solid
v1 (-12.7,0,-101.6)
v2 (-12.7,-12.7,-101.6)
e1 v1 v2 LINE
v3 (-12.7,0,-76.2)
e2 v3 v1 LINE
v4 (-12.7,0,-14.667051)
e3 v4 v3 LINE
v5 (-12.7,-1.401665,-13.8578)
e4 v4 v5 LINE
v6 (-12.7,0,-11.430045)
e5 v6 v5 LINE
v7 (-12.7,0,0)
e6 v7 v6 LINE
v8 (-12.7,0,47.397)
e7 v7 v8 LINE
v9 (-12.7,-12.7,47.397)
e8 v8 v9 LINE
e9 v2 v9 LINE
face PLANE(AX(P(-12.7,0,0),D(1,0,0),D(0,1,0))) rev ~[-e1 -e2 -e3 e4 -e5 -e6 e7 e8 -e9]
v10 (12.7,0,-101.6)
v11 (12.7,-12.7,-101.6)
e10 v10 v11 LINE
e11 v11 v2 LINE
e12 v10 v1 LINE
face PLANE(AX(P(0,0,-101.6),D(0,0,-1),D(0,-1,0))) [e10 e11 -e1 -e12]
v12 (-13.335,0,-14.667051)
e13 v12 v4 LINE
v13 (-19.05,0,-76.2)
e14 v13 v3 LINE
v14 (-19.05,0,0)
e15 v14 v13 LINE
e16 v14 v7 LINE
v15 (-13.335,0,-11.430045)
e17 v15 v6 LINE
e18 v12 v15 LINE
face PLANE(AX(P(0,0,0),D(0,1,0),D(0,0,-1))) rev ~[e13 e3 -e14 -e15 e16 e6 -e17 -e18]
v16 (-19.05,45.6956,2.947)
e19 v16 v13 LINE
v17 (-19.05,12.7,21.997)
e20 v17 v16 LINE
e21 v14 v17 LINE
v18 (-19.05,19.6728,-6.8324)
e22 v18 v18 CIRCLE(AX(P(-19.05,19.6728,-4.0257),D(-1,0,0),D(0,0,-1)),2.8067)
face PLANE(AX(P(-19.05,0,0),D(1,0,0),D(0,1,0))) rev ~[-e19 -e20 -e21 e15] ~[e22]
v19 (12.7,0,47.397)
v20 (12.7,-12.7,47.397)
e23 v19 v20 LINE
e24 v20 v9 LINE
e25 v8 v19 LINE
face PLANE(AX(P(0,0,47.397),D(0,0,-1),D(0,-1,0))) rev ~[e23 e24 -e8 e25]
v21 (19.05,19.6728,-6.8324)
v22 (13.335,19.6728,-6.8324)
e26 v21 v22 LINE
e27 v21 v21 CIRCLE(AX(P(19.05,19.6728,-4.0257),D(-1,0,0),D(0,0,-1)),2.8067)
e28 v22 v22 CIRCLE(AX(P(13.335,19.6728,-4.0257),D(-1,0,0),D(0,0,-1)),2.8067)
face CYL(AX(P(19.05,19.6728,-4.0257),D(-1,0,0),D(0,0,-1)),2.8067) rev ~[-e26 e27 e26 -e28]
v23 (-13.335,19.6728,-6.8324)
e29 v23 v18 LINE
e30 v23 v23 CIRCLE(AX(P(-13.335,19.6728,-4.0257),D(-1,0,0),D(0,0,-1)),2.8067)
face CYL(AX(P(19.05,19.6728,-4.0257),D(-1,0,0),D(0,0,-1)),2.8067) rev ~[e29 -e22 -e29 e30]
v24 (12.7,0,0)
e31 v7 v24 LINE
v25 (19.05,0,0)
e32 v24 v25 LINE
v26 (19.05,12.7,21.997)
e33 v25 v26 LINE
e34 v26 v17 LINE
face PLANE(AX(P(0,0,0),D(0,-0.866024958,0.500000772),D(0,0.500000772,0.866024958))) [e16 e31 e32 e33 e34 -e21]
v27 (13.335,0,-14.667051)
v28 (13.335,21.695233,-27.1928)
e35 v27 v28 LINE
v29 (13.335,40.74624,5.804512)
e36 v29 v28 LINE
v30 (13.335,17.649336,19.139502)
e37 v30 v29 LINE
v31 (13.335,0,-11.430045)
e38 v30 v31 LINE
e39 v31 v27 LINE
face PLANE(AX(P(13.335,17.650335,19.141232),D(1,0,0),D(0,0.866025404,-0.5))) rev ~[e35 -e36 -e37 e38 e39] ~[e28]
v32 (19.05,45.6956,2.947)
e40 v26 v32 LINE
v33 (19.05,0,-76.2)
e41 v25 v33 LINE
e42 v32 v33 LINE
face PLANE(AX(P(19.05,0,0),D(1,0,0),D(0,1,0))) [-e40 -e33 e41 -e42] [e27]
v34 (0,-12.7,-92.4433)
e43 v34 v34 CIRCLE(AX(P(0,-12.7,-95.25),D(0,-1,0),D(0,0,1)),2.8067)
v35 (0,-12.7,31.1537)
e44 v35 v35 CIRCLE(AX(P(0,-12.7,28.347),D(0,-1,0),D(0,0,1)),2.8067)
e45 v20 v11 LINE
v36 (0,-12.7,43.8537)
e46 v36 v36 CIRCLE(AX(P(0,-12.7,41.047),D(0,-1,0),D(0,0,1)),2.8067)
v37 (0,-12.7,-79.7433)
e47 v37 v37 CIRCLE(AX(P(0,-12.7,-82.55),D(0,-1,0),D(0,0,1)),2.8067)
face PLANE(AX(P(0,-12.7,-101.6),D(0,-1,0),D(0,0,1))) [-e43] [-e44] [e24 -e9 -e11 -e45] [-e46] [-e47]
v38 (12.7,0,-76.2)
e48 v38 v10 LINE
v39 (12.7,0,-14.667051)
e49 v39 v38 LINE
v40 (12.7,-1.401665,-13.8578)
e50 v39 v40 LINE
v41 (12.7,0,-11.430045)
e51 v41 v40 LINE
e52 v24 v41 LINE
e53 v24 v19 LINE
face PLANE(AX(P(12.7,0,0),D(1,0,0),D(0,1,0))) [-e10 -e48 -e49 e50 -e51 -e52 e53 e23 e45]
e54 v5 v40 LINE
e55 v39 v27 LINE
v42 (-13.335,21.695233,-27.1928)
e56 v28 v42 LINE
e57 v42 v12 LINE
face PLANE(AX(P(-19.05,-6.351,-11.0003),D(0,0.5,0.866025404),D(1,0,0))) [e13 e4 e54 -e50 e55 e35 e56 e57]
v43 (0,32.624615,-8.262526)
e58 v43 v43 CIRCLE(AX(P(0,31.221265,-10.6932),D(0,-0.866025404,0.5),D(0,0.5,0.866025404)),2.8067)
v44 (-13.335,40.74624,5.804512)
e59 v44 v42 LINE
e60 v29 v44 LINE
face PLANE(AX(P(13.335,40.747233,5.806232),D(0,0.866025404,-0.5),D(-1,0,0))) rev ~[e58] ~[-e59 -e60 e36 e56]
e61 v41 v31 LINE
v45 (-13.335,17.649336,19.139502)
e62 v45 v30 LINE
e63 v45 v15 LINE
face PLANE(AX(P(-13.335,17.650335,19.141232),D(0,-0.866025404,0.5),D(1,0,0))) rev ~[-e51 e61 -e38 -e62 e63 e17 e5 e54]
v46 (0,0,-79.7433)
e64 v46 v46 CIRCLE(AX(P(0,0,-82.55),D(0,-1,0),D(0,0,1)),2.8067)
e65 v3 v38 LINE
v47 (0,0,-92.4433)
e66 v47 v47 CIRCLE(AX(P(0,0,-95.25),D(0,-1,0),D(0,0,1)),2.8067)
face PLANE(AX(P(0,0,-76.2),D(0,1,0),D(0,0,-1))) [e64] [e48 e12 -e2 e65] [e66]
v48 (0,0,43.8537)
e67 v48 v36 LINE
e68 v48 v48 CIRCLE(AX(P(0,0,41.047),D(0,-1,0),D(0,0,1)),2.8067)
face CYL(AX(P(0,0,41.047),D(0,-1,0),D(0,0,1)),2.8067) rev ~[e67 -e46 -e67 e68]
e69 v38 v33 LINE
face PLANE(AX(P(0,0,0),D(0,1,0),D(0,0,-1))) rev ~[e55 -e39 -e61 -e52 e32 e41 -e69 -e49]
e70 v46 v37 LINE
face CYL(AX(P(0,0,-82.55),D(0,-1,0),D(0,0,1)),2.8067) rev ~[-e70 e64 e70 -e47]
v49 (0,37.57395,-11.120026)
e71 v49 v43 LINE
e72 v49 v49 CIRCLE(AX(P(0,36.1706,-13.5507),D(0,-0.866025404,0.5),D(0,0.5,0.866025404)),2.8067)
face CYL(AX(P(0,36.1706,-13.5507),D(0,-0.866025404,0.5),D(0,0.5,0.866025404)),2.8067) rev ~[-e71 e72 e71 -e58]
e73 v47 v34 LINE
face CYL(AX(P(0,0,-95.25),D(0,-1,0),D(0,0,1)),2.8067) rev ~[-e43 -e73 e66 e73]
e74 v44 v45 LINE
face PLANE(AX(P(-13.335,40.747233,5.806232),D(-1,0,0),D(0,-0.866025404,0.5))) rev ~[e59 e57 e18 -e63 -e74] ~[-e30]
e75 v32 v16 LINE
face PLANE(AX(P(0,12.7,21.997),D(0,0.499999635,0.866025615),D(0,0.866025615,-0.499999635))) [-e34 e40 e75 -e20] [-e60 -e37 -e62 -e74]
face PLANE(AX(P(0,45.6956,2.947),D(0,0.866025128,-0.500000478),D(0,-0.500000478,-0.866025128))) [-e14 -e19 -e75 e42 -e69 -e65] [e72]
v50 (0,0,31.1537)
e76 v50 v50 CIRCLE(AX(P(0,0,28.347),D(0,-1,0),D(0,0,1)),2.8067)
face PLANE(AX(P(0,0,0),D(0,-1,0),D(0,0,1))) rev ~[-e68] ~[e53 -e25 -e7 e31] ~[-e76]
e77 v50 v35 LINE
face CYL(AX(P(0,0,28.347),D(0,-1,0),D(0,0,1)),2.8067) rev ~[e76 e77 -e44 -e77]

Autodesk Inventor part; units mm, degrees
ref_plane "YZ Plane" through (0, 0, 0) normal (1, 0, 0) x (0, 1, 0)
ref_plane "XZ Plane" through (0, 0, 0) normal (0, 1, 0) x (-1, 0, 0)
ref_plane "XY Plane" through (0, 0, 0) normal (0, 0, 1) x (1, 0, 0)
sketch "Sketch1" plane through (0, 0, 0) normal (1, 0, 0) x (0, 1, 0)
  line L0 (0, 0) -> (12.7, 21.997)
  line L1 (0, 0) -> (0, 47.397)
  line L2 (0, 0) -> (0, -101.6)
  line L3 (12.7, 21.997) -> (45.6956, 2.947)
  line L4 (45.6956, 2.947) -> (0, -76.2)
  line L5 (12.7, 21.997) -> (0, 21.997) construction
  line L6 (0, 47.397) -> (-12.7, 47.397)
  line L7 (-12.7, 47.397) -> (-12.7, -76.2)
  line L8 (0, -101.6) -> (-12.7, -101.6)
  line L9 (-12.7, -101.6) -> (-12.7, -76.2)
  dimension "d0" = 38.1
  dimension "d1" = 25.4
  dimension "d6" = 30
  dimension "d7" = 25.4
  dimension "d21" = 25.4
  dimension "d22" = 12.7
extrude "Extrusion2" add sketch "Sketch1" along normal mid plane 38.1 contours L0 L3 L4 L2
extrude "Extrusion3" add sketch "Sketch1" along normal mid plane 25.4
sketch "Sketch2" plane through (-19.05, 12.7, 21.997) normal (0, 0.5, 0.8660254) x (1, 0, 0)
  line L0 (32.385, 5.715) -> (32.385, 32.385)
  line L1 (32.385, 32.385) -> (5.715, 32.385)
  line L2 (5.715, 32.385) -> (5.715, 5.715)
  line L3 (5.715, 5.715) -> (32.385, 5.715)
  line L4 (32.385, 5.715) -> (5.715, 32.385) construction
  line L5 (32.385, 32.385) -> (5.715, 5.715) construction
  line L6 (0, 0) -> (0, 38.1) projected
  line L7 (38.1, 38.1) -> (38.1, 0) projected
  line L8 (0, 38.1) -> (38.1, 38.1) projected
  point P0 (19.05, 0)
  point P1 (19.05, 19.05)
  dimension "d16" = 26.67
  dimension "d17" = 19.05
  dimension "d18" = 19.05
extrude "Extrusion4" cut sketch "Sketch2" against normal blind 38.1
sketch "Sketch3" plane through (-12.7, 0, 47.397) normal (0, 1, 0) x (1, 0, 0)
  point P0 (12.7, 47.397)
sketch "Sketch4" plane through (-12.7, 0, 47.397) normal (0, 1, 0) x (1, 0, 0)
  line L0 (25.4, 0) -> (0, 0) projected
  line L1 (-6.35, 25.4) -> (31.75, 25.4) projected
  line L2 (0, 123.597) -> (25.4, 123.597) projected
  line L3 (25.4, 148.997) -> (0, 148.997) projected
  point P0 (12.7, 47.397)
  point P1 (12.7, 6.35)
  point P2 (12.7, 19.05)
  point P3 (12.7, 129.947)
  point P4 (12.7, 142.647)
  dimension "d23" = 6.35
  dimension "d24" = 6.35
  dimension "d25" = 6.35
  dimension "d26" = 6.35
hole "Hole1" at (0, 0, 41.047) at (0, 0, 28.347) at (0, 0, -82.55) at (0, 0, -95.25) direction (0, -1, 0) diameter 5.6134 end through all clearance for "Flat Head Machine Screw (82)" size "#10" standard "Ansi Unified Screw Threads"
sketch "Sketch5" plane through (19.05, 0, 0) normal (1, 0, 0) x (0, 0, -1)
  line L0 (-21.997, 12.7) -> (-2.947, 45.6956) construction
  line L1 (-12.472, 29.1978) -> (38.1, 0) construction
  line L2 (0, 0) -> (76.2, 0) construction
  line L3 (-21.997, 12.7) -> (0, 0) construction
  point P0 (4.0257, 19.6728)
  dimension "d34" = 19.05
sketch "Sketch6" plane through (-19.05, 45.6956, 2.947) normal (0, 0.8660254, -0.5) x (1, 0, 0)
  line L0 (0, 0) -> (38.1, 0) projected
  point P0 (19.05, 25.4)
  point P1 (19.05, 19.05)
  dimension "d35" = 19.05
hole "Hole2" at (0, 36.1706, -13.5507) direction (0, -0.8660254, 0.5) diameter 5.6134 depth 5.715 clearance for "Flat Head Machine Screw (82)" size "#10" standard "Ansi Unified Screw Threads"
hole "Hole3" at (19.05, 19.6728, -4.0257) direction (-1, 0, 0) diameter 5.6134 end through all clearance for "Flat Head Machine Screw (82)" size "#10" standard "Ansi Unified Screw Threads"
properties part number "30degreeAttachement" material "PBT Plastic"
